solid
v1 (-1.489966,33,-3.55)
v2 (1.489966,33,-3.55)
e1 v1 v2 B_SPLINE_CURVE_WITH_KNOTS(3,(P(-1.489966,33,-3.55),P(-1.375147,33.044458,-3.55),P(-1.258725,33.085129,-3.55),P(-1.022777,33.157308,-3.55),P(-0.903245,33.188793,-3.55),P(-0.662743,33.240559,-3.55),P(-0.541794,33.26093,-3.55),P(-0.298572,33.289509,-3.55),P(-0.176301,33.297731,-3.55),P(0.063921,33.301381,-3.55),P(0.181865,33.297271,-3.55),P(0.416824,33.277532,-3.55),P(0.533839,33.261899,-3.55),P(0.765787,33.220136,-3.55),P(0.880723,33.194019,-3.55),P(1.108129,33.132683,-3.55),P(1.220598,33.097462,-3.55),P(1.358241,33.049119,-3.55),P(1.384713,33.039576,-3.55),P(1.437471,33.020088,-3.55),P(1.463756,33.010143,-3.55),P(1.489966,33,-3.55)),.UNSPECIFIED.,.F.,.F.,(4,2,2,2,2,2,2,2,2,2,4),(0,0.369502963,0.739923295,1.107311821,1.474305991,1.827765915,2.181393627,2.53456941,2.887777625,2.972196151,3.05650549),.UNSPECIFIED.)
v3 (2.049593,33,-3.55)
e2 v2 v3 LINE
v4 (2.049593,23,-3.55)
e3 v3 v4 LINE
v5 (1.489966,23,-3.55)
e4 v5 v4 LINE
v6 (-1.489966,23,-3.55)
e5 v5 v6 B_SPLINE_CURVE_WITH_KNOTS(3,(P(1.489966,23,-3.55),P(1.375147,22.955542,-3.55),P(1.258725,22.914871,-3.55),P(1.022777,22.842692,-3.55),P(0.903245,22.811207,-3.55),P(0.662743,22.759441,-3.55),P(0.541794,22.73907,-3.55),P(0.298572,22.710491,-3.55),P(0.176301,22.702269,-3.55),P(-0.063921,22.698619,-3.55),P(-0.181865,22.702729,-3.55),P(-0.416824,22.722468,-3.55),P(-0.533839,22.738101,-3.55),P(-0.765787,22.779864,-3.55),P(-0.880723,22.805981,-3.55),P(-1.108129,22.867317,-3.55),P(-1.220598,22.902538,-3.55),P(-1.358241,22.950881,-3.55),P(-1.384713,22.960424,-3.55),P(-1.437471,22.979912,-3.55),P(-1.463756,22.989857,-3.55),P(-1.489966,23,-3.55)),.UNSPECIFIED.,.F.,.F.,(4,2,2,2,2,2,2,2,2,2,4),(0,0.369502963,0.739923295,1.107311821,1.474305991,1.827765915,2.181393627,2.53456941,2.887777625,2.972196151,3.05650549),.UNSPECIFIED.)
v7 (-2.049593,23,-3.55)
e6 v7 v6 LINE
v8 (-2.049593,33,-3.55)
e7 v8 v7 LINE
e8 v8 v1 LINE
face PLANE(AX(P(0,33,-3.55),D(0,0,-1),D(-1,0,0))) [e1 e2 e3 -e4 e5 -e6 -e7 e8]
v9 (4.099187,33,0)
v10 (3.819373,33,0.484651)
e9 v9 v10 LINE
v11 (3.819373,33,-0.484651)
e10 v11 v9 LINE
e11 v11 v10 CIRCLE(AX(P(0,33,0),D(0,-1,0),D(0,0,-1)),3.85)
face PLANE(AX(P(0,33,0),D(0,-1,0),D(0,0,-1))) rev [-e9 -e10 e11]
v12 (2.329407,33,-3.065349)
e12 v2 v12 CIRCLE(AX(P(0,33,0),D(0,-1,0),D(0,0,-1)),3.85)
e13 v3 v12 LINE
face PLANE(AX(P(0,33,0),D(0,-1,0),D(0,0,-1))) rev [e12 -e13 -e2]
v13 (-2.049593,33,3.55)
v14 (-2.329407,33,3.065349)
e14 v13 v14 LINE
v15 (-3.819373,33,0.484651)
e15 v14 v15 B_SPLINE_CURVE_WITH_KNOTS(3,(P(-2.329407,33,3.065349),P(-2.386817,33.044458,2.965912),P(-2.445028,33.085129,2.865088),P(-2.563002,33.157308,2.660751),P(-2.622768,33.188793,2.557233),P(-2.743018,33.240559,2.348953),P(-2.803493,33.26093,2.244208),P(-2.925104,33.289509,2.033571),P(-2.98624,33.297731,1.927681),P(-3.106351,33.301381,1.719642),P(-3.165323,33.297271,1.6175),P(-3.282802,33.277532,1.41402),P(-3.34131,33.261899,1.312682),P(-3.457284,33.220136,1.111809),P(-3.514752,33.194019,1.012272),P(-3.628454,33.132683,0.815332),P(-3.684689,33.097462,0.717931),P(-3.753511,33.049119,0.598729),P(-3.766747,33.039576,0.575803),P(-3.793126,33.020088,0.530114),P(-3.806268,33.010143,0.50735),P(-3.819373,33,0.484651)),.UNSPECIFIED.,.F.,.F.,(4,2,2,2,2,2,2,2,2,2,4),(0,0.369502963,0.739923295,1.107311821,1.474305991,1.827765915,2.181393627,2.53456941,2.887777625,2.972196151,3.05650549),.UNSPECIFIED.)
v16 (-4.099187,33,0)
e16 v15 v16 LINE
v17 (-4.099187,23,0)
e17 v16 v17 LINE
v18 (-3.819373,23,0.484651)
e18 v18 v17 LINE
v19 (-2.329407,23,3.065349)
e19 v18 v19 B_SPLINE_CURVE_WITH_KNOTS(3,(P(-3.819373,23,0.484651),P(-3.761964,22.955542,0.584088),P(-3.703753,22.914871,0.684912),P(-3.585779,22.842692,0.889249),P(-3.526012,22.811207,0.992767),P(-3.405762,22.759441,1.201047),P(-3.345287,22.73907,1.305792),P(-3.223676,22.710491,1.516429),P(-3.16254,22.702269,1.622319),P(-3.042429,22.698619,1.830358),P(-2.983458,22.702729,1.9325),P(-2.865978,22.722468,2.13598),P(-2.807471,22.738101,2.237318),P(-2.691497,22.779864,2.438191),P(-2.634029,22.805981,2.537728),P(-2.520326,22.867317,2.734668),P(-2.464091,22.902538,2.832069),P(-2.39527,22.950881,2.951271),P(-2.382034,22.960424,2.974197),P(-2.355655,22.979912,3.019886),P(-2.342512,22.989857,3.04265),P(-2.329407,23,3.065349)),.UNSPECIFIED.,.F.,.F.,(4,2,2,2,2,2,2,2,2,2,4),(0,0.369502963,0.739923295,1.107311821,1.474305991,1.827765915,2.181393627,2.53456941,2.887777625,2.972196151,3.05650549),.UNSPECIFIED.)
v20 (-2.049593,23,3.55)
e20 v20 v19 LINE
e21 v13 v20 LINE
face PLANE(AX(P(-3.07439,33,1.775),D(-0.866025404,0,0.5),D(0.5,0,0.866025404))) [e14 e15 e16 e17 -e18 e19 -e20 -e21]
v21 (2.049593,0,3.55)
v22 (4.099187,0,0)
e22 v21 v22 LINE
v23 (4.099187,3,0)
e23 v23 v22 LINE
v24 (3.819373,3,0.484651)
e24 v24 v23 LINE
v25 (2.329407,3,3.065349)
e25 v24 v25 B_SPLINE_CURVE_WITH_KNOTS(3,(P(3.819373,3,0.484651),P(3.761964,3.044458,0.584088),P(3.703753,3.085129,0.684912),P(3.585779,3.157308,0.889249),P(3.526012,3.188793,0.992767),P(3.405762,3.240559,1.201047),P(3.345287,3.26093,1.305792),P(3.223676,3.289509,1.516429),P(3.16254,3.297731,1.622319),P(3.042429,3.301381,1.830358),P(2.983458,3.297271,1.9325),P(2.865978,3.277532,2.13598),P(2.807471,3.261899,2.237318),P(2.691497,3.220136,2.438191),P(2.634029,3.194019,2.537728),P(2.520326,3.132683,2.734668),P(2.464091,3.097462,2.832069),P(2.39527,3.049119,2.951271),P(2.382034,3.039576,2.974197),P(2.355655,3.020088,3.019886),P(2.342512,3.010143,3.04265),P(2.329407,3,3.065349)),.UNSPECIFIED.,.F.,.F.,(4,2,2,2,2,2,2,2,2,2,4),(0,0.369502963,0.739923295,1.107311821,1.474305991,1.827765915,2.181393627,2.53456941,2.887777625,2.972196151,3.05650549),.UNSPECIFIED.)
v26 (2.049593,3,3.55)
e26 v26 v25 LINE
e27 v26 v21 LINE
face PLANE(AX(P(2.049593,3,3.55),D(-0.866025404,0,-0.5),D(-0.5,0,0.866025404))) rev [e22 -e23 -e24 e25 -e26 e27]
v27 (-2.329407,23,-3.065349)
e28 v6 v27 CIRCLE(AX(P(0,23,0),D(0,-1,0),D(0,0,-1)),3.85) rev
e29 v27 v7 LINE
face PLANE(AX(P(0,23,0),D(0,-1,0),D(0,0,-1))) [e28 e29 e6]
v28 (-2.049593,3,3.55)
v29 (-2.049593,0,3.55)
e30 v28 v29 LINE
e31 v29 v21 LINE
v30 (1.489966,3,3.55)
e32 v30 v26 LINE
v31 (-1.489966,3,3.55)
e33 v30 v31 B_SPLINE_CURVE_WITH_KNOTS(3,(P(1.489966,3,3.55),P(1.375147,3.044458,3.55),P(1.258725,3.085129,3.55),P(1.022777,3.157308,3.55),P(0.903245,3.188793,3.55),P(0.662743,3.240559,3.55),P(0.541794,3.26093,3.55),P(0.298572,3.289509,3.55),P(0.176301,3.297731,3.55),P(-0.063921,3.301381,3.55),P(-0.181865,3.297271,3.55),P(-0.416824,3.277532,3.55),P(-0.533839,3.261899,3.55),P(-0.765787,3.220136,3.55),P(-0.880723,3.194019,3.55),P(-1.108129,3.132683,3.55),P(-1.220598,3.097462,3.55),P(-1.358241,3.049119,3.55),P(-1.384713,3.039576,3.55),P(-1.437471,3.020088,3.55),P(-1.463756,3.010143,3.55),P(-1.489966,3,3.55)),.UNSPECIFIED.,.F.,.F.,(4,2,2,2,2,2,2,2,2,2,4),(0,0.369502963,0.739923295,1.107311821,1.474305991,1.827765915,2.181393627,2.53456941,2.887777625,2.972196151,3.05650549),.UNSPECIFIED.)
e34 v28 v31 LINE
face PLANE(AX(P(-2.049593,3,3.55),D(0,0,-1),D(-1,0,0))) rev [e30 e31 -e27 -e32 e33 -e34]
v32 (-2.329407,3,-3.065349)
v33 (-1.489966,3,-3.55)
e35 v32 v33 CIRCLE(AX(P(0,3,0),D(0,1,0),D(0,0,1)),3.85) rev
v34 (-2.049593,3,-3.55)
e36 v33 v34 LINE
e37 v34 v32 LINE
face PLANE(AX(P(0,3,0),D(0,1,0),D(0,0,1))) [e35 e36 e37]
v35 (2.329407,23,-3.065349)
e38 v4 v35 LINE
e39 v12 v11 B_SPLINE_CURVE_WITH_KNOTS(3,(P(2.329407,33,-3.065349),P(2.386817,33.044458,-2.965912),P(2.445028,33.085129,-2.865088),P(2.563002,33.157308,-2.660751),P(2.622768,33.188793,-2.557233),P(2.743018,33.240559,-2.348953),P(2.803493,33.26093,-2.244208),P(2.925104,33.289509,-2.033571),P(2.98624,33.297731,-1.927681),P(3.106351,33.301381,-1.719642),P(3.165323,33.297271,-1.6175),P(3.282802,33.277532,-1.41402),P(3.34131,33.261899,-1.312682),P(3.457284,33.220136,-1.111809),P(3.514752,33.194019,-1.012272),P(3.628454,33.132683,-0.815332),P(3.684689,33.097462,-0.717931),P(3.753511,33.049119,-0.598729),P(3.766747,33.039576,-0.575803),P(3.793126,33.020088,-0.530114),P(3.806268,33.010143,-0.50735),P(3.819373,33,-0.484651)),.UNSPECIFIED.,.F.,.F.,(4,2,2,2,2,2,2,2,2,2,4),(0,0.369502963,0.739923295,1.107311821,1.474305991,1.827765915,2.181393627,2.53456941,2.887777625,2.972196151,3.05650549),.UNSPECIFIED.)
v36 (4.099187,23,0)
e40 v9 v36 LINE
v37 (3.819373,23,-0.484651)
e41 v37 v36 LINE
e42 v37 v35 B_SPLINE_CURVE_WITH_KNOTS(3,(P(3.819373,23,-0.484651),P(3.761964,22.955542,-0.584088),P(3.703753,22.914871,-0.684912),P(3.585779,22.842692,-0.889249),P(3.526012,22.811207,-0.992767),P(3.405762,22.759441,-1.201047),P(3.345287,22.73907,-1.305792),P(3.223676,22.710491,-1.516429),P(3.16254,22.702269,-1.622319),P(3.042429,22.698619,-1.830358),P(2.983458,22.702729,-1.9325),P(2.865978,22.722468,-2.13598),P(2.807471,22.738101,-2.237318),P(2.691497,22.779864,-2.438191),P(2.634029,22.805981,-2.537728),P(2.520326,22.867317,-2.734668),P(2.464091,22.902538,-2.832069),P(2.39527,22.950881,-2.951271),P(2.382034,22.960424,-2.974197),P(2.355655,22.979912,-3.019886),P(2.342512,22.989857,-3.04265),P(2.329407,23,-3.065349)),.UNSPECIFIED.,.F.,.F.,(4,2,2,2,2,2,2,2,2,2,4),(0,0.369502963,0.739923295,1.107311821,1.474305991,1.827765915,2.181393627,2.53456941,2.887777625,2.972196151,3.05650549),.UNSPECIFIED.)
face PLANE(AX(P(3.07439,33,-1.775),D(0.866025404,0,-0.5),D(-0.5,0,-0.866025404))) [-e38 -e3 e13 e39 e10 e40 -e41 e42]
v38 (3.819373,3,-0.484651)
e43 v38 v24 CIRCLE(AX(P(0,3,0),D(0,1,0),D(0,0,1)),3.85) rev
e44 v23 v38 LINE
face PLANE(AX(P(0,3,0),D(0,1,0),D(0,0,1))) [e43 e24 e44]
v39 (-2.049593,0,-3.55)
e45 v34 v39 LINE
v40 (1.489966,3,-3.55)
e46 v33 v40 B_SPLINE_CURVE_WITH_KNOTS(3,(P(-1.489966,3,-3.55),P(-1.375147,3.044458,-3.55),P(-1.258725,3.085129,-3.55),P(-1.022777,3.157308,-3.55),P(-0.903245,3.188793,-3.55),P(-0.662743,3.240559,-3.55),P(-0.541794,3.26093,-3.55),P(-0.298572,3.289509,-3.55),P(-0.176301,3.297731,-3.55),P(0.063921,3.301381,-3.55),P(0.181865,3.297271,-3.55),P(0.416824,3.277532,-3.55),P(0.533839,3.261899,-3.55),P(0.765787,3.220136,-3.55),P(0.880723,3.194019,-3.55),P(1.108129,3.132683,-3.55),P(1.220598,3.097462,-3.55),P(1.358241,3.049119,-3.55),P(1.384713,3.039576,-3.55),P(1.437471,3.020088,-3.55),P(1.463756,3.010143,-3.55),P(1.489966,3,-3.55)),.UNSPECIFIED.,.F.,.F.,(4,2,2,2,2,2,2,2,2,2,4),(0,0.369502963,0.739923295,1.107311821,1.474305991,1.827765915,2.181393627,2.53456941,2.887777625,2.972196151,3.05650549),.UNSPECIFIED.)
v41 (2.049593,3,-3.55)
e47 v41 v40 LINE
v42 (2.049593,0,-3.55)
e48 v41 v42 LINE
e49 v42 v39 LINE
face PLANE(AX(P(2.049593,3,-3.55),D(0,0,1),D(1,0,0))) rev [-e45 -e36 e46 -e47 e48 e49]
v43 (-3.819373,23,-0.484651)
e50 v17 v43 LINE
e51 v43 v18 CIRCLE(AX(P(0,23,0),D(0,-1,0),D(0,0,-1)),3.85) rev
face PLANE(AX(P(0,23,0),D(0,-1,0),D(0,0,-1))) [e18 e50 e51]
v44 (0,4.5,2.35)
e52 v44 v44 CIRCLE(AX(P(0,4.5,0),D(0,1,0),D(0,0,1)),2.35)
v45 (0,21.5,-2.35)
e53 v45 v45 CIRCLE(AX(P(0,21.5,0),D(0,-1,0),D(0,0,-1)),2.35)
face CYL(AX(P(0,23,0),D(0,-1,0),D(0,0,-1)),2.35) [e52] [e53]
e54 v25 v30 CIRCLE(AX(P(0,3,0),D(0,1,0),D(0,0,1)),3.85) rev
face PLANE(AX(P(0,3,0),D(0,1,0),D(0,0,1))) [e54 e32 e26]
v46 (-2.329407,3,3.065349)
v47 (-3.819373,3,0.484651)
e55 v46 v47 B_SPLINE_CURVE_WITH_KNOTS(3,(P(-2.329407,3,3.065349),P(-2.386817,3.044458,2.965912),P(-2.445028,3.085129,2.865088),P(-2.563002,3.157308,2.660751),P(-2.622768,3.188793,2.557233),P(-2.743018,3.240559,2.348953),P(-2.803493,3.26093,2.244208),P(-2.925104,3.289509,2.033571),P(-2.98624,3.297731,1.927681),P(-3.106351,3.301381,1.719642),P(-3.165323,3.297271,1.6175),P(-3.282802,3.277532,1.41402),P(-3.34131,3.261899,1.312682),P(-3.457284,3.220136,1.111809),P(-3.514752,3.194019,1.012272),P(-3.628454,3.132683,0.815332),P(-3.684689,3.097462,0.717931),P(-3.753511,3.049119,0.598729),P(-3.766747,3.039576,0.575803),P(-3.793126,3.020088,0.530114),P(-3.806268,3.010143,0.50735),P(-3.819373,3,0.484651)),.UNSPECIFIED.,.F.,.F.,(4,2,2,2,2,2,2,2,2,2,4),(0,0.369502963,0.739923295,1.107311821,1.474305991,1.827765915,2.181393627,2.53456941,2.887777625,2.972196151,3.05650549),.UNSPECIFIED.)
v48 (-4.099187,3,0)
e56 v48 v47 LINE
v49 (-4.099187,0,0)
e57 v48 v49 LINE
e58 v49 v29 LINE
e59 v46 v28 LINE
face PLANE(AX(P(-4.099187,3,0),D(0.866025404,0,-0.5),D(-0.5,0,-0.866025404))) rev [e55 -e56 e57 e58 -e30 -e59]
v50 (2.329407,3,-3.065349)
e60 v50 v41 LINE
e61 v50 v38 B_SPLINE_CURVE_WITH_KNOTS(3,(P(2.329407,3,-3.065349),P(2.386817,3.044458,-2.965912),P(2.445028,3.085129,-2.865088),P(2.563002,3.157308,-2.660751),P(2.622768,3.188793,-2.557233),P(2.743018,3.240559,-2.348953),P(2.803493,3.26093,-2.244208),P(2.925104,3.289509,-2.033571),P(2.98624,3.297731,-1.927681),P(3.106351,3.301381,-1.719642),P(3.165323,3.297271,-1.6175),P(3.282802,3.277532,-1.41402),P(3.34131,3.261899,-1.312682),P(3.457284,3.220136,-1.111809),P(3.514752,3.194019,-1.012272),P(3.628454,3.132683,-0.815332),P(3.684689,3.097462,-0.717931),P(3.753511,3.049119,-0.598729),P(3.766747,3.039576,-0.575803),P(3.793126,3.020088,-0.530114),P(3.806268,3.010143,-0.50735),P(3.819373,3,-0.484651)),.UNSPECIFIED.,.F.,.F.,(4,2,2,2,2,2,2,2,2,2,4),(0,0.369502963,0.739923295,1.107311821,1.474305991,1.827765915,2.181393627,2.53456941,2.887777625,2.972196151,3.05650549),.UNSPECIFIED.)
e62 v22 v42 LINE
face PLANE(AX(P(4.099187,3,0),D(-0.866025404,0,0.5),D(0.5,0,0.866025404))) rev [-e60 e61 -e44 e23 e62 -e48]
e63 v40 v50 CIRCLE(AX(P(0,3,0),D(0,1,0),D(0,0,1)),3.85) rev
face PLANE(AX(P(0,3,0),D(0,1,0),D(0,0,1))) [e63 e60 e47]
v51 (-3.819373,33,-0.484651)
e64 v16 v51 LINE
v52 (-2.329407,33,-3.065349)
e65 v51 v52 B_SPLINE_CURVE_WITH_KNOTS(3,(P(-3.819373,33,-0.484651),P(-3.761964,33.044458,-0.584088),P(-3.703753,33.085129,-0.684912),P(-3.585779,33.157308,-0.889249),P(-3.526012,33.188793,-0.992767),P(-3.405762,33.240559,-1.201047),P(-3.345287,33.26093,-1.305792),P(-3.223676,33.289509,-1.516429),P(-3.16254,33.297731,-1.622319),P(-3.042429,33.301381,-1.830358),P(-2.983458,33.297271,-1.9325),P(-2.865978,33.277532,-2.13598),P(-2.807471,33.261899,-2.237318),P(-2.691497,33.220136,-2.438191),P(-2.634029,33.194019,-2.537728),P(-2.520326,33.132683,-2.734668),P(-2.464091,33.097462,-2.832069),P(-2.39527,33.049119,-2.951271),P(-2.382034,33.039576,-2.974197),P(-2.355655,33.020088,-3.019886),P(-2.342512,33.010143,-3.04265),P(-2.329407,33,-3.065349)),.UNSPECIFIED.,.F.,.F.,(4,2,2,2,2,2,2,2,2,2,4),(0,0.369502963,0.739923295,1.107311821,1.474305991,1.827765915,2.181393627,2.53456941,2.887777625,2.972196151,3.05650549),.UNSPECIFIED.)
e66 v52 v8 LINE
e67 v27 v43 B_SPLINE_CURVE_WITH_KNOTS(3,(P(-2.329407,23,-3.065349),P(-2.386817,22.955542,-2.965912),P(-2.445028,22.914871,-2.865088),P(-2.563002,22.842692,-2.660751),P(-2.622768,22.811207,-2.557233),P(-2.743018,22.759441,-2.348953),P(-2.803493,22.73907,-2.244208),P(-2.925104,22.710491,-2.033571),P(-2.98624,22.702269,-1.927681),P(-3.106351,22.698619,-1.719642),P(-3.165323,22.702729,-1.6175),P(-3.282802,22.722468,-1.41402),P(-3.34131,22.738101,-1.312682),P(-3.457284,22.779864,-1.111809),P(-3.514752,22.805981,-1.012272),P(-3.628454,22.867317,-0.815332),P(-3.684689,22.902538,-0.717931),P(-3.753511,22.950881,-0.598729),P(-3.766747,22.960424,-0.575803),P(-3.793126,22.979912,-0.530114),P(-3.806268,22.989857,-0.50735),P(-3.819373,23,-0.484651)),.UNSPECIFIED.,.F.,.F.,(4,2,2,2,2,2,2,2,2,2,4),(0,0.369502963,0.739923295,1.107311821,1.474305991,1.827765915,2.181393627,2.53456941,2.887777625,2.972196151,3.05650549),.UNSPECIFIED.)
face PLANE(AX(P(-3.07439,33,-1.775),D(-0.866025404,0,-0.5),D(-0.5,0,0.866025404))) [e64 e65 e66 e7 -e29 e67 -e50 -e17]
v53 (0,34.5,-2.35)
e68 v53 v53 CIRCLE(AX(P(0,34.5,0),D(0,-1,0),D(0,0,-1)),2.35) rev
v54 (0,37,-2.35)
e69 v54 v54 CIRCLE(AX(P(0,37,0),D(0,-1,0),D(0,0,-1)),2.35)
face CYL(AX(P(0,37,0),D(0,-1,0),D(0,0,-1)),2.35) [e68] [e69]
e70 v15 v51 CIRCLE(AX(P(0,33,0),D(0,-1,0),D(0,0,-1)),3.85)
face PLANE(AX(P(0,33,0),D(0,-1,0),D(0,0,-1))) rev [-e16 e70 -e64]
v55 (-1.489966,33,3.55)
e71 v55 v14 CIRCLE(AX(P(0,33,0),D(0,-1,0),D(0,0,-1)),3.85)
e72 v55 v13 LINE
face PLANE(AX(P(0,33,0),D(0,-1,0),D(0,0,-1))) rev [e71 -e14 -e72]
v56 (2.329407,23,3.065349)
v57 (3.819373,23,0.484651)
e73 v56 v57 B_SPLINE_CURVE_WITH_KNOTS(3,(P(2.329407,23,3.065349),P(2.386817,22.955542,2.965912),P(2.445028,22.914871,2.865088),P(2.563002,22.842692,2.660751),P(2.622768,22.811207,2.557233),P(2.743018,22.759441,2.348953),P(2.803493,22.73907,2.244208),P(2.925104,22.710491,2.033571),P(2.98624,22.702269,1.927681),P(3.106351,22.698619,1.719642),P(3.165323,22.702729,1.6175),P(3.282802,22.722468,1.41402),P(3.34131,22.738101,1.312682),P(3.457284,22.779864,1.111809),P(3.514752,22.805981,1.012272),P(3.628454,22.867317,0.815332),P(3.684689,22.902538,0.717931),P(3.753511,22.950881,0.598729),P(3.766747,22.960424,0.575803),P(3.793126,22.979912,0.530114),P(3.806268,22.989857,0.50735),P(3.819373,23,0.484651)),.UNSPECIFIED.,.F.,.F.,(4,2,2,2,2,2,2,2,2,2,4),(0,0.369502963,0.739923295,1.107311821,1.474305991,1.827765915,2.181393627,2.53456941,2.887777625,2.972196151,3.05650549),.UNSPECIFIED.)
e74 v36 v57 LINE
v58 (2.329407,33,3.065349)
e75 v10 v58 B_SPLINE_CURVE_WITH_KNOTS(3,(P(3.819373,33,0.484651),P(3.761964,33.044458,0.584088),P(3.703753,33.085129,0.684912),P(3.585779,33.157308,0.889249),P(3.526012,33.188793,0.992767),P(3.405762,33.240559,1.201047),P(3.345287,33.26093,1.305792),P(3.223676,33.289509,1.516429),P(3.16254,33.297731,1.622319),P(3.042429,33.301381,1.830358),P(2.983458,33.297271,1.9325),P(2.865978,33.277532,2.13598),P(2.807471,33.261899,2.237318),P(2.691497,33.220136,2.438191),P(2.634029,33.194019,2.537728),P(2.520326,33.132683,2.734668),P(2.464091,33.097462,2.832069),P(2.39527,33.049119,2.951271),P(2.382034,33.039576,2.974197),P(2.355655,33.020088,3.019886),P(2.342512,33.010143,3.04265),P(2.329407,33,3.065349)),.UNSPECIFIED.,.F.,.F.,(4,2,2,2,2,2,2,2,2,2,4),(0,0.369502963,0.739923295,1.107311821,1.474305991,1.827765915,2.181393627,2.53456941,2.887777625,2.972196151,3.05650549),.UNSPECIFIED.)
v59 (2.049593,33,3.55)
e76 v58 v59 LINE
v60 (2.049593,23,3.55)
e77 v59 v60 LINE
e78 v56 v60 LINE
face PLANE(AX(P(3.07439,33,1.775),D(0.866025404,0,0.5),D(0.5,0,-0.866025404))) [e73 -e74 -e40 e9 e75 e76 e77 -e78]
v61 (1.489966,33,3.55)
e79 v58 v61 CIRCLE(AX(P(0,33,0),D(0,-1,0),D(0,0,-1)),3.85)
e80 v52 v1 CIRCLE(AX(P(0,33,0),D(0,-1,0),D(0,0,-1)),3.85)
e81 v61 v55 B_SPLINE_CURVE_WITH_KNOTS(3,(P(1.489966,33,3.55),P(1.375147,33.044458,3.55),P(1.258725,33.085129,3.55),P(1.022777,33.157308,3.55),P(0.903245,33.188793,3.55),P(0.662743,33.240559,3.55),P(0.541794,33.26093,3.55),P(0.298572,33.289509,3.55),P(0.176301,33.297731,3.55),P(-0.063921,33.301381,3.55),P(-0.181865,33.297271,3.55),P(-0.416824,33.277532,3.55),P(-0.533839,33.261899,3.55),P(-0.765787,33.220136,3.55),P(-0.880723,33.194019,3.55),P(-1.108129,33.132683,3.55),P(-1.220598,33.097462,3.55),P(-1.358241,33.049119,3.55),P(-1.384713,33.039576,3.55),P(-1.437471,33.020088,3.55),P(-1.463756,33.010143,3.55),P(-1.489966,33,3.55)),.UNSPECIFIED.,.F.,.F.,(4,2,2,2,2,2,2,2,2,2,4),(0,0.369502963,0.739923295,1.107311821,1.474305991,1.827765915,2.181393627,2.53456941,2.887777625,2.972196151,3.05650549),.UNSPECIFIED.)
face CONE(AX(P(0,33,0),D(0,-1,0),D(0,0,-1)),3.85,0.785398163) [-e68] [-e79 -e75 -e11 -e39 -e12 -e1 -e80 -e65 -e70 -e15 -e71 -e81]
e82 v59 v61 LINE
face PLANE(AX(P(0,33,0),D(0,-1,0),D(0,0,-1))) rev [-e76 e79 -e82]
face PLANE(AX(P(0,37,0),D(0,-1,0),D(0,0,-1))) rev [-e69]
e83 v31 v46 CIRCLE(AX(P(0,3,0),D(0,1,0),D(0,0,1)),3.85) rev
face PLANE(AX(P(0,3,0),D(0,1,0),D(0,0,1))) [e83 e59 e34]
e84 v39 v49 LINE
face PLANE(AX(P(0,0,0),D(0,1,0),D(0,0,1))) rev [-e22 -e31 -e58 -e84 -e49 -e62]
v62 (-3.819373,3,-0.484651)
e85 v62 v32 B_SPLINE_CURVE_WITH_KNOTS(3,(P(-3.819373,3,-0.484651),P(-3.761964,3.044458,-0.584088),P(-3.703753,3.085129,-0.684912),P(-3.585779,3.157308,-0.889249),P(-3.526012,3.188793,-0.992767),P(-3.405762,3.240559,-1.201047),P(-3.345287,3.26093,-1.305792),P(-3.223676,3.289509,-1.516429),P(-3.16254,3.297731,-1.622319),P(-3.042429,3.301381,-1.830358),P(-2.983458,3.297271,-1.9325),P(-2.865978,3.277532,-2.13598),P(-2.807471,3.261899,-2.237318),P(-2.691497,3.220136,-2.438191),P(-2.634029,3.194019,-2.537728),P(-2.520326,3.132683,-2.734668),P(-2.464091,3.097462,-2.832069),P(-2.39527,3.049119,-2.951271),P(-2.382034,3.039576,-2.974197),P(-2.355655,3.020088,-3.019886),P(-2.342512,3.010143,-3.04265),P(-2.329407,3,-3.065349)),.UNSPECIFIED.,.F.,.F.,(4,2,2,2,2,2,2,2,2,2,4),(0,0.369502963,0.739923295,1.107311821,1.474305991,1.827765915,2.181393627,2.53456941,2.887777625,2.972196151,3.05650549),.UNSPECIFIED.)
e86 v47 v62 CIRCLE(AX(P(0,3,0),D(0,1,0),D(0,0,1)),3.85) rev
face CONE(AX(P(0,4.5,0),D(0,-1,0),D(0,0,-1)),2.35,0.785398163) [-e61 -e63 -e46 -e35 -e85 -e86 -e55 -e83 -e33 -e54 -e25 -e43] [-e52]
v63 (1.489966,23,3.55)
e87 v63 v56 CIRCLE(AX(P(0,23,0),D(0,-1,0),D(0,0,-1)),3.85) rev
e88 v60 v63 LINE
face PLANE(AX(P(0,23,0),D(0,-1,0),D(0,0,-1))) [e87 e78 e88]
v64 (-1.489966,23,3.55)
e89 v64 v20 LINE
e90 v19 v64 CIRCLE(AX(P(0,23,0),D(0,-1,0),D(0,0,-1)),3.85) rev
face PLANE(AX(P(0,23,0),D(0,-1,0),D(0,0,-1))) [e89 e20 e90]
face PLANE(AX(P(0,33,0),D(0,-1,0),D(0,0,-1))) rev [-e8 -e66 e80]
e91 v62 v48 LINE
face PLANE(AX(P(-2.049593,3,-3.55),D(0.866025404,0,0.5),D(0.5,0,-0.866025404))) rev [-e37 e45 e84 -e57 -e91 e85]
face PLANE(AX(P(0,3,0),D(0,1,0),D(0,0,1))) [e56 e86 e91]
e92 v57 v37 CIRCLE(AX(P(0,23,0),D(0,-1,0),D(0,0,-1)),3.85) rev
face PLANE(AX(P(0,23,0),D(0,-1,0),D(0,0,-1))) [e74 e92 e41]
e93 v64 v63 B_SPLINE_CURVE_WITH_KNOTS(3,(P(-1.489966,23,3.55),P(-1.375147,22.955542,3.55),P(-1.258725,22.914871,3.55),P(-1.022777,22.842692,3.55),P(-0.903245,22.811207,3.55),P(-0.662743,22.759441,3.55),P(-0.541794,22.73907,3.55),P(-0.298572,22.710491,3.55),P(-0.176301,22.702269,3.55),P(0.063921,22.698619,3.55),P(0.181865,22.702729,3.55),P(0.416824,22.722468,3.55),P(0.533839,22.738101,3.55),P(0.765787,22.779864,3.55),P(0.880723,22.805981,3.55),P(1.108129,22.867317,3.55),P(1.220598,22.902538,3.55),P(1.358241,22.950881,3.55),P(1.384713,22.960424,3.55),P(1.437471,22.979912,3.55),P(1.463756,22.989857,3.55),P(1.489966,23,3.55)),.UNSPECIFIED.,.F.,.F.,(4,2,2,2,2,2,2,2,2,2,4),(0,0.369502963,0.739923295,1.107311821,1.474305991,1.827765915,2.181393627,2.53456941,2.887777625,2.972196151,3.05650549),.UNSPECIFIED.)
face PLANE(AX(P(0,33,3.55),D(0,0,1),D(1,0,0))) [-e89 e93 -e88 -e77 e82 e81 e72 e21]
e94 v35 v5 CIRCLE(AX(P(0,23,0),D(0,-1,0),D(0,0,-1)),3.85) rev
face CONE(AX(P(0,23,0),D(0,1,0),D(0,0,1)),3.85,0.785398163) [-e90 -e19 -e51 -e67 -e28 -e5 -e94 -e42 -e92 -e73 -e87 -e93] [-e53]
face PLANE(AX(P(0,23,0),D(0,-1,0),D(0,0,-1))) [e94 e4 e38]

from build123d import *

# Parameters (mm, degrees)
BOSS_EXTRUDE1_DEPTH = 3
SKETCH2_R           = 2.35
BOSS_EXTRUDE2_DEPTH = 20
BOSS_EXTRUDE3_START = 23
BOSS_EXTRUDE3_DEPTH = 10
BOSS_EXTRUDE4_START = 30
SKETCH2_2_R         = 2.35
BOSS_EXTRUDE4_DEPTH = 4
CHAMFER1_SIZE       = 1.5


with BuildPart() as part:
    # Sketch1 → Boss-Extrude1 (new body)
    with BuildSketch(Plane(origin=(0, 0, 0), x_dir=(1, 0, 0), z_dir=(0, 1, 0))):
        Polygon((2.049593456, -3.55), (4.099186911, 0), (2.049593456, 3.55), (-2.049593456, 3.55), (-4.099186911, 0), (-2.049593456, -3.55), align=None)
    extrude(amount=BOSS_EXTRUDE1_DEPTH)

    # Sketch2 → Boss-Extrude2 (add)
    with BuildSketch(Plane(origin=(0, 3, 0), x_dir=(1, 0, 0), z_dir=(0, 1, 0))):
        with Locations(Location((0, 0, 0), (0, 0, 270))):
            Circle(SKETCH2_R)
    extrude(amount=BOSS_EXTRUDE2_DEPTH)

    # Sketch1<2> → Boss-Extrude3 (add)
    with BuildSketch(Plane(origin=(0, 0, 0), x_dir=(1, 0, 0), z_dir=(0, 1, 0)).offset(BOSS_EXTRUDE3_START)):
        Polygon((2.049593456, -3.55), (4.099186911, 0), (2.049593456, 3.55), (-2.049593456, 3.55), (-4.099186911, 0), (-2.049593456, -3.55), align=None)
    extrude(amount=BOSS_EXTRUDE3_DEPTH)

    # Sketch2<2> → Boss-Extrude4 (add)
    with BuildSketch(Plane(origin=(0, 3, 0), x_dir=(1, 0, 0), z_dir=(0, 1, 0)).offset(BOSS_EXTRUDE4_START)):
        with Locations(Location((0, 0, 0), (0, 0, 270))):
            Circle(SKETCH2_2_R)
    extrude(amount=BOSS_EXTRUDE4_DEPTH)

    # Chamfer1
    # the kernel refuses this chamfer: 1.5 mm, written as the material it adds along each edge
    with BuildSketch(Plane(origin=(0, 3, 0), x_dir=(0, 0, 1), z_dir=(-1, 0, 0))) as chamfer1_piece_1_section:
        Polygon((2.35, CHAMFER1_SIZE), (2.35 + CHAMFER1_SIZE, 0), (2.35, 0), align=None)
    chamfer1_piece_1 = revolve(axis=Axis((0, 3, 0), (0, 1, 0)), mode=Mode.PRIVATE)
    chamfer1_piece_1 = split(chamfer1_piece_1, bisect_by=Plane(origin=(4.408223306, 3.730355649, -0.535266737), z_dir=(-0.8660254037844387, 0, -0.5)), keep=Keep.TOP, mode=Mode.PRIVATE)
    chamfer1_piece_1 = split(chamfer1_piece_1, bisect_by=Plane(origin=(0, 3.730355649, 3.55), z_dir=(0, 0, -1)), keep=Keep.TOP, mode=Mode.PRIVATE)
    chamfer1_piece_1 = split(chamfer1_piece_1, bisect_by=Plane(origin=(1.740557061, 3.730355649, -4.085266737), z_dir=(-0.8660254037844387, 0, 0.5000000000000003)), keep=Keep.TOP, mode=Mode.PRIVATE)
    chamfer1_piece_1 = split(chamfer1_piece_1, bisect_by=Plane(origin=(-4.408223306, 3.730355649, -0.535266737), z_dir=(0.8660254037844387, 0, -0.5000000000000003)), keep=Keep.TOP, mode=Mode.PRIVATE)
    chamfer1_piece_1 = split(chamfer1_piece_1, bisect_by=Plane(origin=(0, 3.730355649, -3.55), z_dir=(0, 0, 1)), keep=Keep.TOP, mode=Mode.PRIVATE)
    chamfer1_piece_1 = split(chamfer1_piece_1, bisect_by=Plane(origin=(-1.740557061, 3.730355649, -4.085266737), z_dir=(0.8660254037844386, 0, 0.5000000000000002)), keep=Keep.TOP, mode=Mode.PRIVATE)
    add(chamfer1_piece_1)
    with BuildSketch(Plane(origin=(0, 23, 0), x_dir=(0, 0, 1), z_dir=(-1, 0, 0))) as chamfer1_piece_2_section:
        Polygon((2.35 + CHAMFER1_SIZE, 0), (2.35, -CHAMFER1_SIZE), (2.35, 0), align=None)
    chamfer1_piece_2 = revolve(axis=Axis((0, 23, 0), (0, 1, 0)), mode=Mode.PRIVATE)
    chamfer1_piece_2 = split(chamfer1_piece_2, bisect_by=Plane(origin=(4.408223304, 22.269644356, -0.535266733), z_dir=(-0.8660254037844387, 0, -0.5)), keep=Keep.TOP, mode=Mode.PRIVATE)
    chamfer1_piece_2 = split(chamfer1_piece_2, bisect_by=Plane(origin=(0, 22.269644356, 3.55), z_dir=(0, 0, -1)), keep=Keep.TOP, mode=Mode.PRIVATE)
    chamfer1_piece_2 = split(chamfer1_piece_2, bisect_by=Plane(origin=(1.740557063, 22.269644356, -4.085266733), z_dir=(-0.8660254037844387, 0, 0.5000000000000003)), keep=Keep.TOP, mode=Mode.PRIVATE)
    chamfer1_piece_2 = split(chamfer1_piece_2, bisect_by=Plane(origin=(-4.408223304, 22.269644356, -0.535266733), z_dir=(0.8660254037844387, 0, -0.5000000000000003)), keep=Keep.TOP, mode=Mode.PRIVATE)
    chamfer1_piece_2 = split(chamfer1_piece_2, bisect_by=Plane(origin=(0, 22.269644356, -3.55), z_dir=(0, 0, 1)), keep=Keep.TOP, mode=Mode.PRIVATE)
    chamfer1_piece_2 = split(chamfer1_piece_2, bisect_by=Plane(origin=(-1.740557063, 22.269644356, -4.085266733), z_dir=(0.8660254037844386, 0, 0.5000000000000002)), keep=Keep.TOP, mode=Mode.PRIVATE)
    add(chamfer1_piece_2)
    with BuildSketch(Plane(origin=(0, 33, 0), x_dir=(0, 0, 1), z_dir=(-1, 0, 0))) as chamfer1_piece_3_section:
        Polygon((2.35 + CHAMFER1_SIZE, 0), (2.35, CHAMFER1_SIZE), (2.35, 0), align=None)
    chamfer1_piece_3 = revolve(axis=Axis((0, 33, 0), (0, 1, 0)), mode=Mode.PRIVATE)
    chamfer1_piece_3 = split(chamfer1_piece_3, bisect_by=Plane(origin=(4.408223304, 33.730355644, -0.535266733), z_dir=(-0.8660254037844387, 0, -0.5)), keep=Keep.TOP, mode=Mode.PRIVATE)
    chamfer1_piece_3 = split(chamfer1_piece_3, bisect_by=Plane(origin=(0, 33.730355644, 3.55), z_dir=(0, 0, -1)), keep=Keep.TOP, mode=Mode.PRIVATE)
    chamfer1_piece_3 = split(chamfer1_piece_3, bisect_by=Plane(origin=(1.740557063, 33.730355644, -4.085266733), z_dir=(-0.8660254037844387, 0, 0.5000000000000003)), keep=Keep.TOP, mode=Mode.PRIVATE)
    chamfer1_piece_3 = split(chamfer1_piece_3, bisect_by=Plane(origin=(-4.408223304, 33.730355644, -0.535266733), z_dir=(0.8660254037844387, 0, -0.5000000000000003)), keep=Keep.TOP, mode=Mode.PRIVATE)
    chamfer1_piece_3 = split(chamfer1_piece_3, bisect_by=Plane(origin=(0, 33.730355644, -3.55), z_dir=(0, 0, 1)), keep=Keep.TOP, mode=Mode.PRIVATE)
    chamfer1_piece_3 = split(chamfer1_piece_3, bisect_by=Plane(origin=(-1.740557063, 33.730355644, -4.085266733), z_dir=(0.8660254037844386, 0, 0.5000000000000002)), keep=Keep.TOP, mode=Mode.PRIVATE)
    add(chamfer1_piece_3)


solid = part.part
